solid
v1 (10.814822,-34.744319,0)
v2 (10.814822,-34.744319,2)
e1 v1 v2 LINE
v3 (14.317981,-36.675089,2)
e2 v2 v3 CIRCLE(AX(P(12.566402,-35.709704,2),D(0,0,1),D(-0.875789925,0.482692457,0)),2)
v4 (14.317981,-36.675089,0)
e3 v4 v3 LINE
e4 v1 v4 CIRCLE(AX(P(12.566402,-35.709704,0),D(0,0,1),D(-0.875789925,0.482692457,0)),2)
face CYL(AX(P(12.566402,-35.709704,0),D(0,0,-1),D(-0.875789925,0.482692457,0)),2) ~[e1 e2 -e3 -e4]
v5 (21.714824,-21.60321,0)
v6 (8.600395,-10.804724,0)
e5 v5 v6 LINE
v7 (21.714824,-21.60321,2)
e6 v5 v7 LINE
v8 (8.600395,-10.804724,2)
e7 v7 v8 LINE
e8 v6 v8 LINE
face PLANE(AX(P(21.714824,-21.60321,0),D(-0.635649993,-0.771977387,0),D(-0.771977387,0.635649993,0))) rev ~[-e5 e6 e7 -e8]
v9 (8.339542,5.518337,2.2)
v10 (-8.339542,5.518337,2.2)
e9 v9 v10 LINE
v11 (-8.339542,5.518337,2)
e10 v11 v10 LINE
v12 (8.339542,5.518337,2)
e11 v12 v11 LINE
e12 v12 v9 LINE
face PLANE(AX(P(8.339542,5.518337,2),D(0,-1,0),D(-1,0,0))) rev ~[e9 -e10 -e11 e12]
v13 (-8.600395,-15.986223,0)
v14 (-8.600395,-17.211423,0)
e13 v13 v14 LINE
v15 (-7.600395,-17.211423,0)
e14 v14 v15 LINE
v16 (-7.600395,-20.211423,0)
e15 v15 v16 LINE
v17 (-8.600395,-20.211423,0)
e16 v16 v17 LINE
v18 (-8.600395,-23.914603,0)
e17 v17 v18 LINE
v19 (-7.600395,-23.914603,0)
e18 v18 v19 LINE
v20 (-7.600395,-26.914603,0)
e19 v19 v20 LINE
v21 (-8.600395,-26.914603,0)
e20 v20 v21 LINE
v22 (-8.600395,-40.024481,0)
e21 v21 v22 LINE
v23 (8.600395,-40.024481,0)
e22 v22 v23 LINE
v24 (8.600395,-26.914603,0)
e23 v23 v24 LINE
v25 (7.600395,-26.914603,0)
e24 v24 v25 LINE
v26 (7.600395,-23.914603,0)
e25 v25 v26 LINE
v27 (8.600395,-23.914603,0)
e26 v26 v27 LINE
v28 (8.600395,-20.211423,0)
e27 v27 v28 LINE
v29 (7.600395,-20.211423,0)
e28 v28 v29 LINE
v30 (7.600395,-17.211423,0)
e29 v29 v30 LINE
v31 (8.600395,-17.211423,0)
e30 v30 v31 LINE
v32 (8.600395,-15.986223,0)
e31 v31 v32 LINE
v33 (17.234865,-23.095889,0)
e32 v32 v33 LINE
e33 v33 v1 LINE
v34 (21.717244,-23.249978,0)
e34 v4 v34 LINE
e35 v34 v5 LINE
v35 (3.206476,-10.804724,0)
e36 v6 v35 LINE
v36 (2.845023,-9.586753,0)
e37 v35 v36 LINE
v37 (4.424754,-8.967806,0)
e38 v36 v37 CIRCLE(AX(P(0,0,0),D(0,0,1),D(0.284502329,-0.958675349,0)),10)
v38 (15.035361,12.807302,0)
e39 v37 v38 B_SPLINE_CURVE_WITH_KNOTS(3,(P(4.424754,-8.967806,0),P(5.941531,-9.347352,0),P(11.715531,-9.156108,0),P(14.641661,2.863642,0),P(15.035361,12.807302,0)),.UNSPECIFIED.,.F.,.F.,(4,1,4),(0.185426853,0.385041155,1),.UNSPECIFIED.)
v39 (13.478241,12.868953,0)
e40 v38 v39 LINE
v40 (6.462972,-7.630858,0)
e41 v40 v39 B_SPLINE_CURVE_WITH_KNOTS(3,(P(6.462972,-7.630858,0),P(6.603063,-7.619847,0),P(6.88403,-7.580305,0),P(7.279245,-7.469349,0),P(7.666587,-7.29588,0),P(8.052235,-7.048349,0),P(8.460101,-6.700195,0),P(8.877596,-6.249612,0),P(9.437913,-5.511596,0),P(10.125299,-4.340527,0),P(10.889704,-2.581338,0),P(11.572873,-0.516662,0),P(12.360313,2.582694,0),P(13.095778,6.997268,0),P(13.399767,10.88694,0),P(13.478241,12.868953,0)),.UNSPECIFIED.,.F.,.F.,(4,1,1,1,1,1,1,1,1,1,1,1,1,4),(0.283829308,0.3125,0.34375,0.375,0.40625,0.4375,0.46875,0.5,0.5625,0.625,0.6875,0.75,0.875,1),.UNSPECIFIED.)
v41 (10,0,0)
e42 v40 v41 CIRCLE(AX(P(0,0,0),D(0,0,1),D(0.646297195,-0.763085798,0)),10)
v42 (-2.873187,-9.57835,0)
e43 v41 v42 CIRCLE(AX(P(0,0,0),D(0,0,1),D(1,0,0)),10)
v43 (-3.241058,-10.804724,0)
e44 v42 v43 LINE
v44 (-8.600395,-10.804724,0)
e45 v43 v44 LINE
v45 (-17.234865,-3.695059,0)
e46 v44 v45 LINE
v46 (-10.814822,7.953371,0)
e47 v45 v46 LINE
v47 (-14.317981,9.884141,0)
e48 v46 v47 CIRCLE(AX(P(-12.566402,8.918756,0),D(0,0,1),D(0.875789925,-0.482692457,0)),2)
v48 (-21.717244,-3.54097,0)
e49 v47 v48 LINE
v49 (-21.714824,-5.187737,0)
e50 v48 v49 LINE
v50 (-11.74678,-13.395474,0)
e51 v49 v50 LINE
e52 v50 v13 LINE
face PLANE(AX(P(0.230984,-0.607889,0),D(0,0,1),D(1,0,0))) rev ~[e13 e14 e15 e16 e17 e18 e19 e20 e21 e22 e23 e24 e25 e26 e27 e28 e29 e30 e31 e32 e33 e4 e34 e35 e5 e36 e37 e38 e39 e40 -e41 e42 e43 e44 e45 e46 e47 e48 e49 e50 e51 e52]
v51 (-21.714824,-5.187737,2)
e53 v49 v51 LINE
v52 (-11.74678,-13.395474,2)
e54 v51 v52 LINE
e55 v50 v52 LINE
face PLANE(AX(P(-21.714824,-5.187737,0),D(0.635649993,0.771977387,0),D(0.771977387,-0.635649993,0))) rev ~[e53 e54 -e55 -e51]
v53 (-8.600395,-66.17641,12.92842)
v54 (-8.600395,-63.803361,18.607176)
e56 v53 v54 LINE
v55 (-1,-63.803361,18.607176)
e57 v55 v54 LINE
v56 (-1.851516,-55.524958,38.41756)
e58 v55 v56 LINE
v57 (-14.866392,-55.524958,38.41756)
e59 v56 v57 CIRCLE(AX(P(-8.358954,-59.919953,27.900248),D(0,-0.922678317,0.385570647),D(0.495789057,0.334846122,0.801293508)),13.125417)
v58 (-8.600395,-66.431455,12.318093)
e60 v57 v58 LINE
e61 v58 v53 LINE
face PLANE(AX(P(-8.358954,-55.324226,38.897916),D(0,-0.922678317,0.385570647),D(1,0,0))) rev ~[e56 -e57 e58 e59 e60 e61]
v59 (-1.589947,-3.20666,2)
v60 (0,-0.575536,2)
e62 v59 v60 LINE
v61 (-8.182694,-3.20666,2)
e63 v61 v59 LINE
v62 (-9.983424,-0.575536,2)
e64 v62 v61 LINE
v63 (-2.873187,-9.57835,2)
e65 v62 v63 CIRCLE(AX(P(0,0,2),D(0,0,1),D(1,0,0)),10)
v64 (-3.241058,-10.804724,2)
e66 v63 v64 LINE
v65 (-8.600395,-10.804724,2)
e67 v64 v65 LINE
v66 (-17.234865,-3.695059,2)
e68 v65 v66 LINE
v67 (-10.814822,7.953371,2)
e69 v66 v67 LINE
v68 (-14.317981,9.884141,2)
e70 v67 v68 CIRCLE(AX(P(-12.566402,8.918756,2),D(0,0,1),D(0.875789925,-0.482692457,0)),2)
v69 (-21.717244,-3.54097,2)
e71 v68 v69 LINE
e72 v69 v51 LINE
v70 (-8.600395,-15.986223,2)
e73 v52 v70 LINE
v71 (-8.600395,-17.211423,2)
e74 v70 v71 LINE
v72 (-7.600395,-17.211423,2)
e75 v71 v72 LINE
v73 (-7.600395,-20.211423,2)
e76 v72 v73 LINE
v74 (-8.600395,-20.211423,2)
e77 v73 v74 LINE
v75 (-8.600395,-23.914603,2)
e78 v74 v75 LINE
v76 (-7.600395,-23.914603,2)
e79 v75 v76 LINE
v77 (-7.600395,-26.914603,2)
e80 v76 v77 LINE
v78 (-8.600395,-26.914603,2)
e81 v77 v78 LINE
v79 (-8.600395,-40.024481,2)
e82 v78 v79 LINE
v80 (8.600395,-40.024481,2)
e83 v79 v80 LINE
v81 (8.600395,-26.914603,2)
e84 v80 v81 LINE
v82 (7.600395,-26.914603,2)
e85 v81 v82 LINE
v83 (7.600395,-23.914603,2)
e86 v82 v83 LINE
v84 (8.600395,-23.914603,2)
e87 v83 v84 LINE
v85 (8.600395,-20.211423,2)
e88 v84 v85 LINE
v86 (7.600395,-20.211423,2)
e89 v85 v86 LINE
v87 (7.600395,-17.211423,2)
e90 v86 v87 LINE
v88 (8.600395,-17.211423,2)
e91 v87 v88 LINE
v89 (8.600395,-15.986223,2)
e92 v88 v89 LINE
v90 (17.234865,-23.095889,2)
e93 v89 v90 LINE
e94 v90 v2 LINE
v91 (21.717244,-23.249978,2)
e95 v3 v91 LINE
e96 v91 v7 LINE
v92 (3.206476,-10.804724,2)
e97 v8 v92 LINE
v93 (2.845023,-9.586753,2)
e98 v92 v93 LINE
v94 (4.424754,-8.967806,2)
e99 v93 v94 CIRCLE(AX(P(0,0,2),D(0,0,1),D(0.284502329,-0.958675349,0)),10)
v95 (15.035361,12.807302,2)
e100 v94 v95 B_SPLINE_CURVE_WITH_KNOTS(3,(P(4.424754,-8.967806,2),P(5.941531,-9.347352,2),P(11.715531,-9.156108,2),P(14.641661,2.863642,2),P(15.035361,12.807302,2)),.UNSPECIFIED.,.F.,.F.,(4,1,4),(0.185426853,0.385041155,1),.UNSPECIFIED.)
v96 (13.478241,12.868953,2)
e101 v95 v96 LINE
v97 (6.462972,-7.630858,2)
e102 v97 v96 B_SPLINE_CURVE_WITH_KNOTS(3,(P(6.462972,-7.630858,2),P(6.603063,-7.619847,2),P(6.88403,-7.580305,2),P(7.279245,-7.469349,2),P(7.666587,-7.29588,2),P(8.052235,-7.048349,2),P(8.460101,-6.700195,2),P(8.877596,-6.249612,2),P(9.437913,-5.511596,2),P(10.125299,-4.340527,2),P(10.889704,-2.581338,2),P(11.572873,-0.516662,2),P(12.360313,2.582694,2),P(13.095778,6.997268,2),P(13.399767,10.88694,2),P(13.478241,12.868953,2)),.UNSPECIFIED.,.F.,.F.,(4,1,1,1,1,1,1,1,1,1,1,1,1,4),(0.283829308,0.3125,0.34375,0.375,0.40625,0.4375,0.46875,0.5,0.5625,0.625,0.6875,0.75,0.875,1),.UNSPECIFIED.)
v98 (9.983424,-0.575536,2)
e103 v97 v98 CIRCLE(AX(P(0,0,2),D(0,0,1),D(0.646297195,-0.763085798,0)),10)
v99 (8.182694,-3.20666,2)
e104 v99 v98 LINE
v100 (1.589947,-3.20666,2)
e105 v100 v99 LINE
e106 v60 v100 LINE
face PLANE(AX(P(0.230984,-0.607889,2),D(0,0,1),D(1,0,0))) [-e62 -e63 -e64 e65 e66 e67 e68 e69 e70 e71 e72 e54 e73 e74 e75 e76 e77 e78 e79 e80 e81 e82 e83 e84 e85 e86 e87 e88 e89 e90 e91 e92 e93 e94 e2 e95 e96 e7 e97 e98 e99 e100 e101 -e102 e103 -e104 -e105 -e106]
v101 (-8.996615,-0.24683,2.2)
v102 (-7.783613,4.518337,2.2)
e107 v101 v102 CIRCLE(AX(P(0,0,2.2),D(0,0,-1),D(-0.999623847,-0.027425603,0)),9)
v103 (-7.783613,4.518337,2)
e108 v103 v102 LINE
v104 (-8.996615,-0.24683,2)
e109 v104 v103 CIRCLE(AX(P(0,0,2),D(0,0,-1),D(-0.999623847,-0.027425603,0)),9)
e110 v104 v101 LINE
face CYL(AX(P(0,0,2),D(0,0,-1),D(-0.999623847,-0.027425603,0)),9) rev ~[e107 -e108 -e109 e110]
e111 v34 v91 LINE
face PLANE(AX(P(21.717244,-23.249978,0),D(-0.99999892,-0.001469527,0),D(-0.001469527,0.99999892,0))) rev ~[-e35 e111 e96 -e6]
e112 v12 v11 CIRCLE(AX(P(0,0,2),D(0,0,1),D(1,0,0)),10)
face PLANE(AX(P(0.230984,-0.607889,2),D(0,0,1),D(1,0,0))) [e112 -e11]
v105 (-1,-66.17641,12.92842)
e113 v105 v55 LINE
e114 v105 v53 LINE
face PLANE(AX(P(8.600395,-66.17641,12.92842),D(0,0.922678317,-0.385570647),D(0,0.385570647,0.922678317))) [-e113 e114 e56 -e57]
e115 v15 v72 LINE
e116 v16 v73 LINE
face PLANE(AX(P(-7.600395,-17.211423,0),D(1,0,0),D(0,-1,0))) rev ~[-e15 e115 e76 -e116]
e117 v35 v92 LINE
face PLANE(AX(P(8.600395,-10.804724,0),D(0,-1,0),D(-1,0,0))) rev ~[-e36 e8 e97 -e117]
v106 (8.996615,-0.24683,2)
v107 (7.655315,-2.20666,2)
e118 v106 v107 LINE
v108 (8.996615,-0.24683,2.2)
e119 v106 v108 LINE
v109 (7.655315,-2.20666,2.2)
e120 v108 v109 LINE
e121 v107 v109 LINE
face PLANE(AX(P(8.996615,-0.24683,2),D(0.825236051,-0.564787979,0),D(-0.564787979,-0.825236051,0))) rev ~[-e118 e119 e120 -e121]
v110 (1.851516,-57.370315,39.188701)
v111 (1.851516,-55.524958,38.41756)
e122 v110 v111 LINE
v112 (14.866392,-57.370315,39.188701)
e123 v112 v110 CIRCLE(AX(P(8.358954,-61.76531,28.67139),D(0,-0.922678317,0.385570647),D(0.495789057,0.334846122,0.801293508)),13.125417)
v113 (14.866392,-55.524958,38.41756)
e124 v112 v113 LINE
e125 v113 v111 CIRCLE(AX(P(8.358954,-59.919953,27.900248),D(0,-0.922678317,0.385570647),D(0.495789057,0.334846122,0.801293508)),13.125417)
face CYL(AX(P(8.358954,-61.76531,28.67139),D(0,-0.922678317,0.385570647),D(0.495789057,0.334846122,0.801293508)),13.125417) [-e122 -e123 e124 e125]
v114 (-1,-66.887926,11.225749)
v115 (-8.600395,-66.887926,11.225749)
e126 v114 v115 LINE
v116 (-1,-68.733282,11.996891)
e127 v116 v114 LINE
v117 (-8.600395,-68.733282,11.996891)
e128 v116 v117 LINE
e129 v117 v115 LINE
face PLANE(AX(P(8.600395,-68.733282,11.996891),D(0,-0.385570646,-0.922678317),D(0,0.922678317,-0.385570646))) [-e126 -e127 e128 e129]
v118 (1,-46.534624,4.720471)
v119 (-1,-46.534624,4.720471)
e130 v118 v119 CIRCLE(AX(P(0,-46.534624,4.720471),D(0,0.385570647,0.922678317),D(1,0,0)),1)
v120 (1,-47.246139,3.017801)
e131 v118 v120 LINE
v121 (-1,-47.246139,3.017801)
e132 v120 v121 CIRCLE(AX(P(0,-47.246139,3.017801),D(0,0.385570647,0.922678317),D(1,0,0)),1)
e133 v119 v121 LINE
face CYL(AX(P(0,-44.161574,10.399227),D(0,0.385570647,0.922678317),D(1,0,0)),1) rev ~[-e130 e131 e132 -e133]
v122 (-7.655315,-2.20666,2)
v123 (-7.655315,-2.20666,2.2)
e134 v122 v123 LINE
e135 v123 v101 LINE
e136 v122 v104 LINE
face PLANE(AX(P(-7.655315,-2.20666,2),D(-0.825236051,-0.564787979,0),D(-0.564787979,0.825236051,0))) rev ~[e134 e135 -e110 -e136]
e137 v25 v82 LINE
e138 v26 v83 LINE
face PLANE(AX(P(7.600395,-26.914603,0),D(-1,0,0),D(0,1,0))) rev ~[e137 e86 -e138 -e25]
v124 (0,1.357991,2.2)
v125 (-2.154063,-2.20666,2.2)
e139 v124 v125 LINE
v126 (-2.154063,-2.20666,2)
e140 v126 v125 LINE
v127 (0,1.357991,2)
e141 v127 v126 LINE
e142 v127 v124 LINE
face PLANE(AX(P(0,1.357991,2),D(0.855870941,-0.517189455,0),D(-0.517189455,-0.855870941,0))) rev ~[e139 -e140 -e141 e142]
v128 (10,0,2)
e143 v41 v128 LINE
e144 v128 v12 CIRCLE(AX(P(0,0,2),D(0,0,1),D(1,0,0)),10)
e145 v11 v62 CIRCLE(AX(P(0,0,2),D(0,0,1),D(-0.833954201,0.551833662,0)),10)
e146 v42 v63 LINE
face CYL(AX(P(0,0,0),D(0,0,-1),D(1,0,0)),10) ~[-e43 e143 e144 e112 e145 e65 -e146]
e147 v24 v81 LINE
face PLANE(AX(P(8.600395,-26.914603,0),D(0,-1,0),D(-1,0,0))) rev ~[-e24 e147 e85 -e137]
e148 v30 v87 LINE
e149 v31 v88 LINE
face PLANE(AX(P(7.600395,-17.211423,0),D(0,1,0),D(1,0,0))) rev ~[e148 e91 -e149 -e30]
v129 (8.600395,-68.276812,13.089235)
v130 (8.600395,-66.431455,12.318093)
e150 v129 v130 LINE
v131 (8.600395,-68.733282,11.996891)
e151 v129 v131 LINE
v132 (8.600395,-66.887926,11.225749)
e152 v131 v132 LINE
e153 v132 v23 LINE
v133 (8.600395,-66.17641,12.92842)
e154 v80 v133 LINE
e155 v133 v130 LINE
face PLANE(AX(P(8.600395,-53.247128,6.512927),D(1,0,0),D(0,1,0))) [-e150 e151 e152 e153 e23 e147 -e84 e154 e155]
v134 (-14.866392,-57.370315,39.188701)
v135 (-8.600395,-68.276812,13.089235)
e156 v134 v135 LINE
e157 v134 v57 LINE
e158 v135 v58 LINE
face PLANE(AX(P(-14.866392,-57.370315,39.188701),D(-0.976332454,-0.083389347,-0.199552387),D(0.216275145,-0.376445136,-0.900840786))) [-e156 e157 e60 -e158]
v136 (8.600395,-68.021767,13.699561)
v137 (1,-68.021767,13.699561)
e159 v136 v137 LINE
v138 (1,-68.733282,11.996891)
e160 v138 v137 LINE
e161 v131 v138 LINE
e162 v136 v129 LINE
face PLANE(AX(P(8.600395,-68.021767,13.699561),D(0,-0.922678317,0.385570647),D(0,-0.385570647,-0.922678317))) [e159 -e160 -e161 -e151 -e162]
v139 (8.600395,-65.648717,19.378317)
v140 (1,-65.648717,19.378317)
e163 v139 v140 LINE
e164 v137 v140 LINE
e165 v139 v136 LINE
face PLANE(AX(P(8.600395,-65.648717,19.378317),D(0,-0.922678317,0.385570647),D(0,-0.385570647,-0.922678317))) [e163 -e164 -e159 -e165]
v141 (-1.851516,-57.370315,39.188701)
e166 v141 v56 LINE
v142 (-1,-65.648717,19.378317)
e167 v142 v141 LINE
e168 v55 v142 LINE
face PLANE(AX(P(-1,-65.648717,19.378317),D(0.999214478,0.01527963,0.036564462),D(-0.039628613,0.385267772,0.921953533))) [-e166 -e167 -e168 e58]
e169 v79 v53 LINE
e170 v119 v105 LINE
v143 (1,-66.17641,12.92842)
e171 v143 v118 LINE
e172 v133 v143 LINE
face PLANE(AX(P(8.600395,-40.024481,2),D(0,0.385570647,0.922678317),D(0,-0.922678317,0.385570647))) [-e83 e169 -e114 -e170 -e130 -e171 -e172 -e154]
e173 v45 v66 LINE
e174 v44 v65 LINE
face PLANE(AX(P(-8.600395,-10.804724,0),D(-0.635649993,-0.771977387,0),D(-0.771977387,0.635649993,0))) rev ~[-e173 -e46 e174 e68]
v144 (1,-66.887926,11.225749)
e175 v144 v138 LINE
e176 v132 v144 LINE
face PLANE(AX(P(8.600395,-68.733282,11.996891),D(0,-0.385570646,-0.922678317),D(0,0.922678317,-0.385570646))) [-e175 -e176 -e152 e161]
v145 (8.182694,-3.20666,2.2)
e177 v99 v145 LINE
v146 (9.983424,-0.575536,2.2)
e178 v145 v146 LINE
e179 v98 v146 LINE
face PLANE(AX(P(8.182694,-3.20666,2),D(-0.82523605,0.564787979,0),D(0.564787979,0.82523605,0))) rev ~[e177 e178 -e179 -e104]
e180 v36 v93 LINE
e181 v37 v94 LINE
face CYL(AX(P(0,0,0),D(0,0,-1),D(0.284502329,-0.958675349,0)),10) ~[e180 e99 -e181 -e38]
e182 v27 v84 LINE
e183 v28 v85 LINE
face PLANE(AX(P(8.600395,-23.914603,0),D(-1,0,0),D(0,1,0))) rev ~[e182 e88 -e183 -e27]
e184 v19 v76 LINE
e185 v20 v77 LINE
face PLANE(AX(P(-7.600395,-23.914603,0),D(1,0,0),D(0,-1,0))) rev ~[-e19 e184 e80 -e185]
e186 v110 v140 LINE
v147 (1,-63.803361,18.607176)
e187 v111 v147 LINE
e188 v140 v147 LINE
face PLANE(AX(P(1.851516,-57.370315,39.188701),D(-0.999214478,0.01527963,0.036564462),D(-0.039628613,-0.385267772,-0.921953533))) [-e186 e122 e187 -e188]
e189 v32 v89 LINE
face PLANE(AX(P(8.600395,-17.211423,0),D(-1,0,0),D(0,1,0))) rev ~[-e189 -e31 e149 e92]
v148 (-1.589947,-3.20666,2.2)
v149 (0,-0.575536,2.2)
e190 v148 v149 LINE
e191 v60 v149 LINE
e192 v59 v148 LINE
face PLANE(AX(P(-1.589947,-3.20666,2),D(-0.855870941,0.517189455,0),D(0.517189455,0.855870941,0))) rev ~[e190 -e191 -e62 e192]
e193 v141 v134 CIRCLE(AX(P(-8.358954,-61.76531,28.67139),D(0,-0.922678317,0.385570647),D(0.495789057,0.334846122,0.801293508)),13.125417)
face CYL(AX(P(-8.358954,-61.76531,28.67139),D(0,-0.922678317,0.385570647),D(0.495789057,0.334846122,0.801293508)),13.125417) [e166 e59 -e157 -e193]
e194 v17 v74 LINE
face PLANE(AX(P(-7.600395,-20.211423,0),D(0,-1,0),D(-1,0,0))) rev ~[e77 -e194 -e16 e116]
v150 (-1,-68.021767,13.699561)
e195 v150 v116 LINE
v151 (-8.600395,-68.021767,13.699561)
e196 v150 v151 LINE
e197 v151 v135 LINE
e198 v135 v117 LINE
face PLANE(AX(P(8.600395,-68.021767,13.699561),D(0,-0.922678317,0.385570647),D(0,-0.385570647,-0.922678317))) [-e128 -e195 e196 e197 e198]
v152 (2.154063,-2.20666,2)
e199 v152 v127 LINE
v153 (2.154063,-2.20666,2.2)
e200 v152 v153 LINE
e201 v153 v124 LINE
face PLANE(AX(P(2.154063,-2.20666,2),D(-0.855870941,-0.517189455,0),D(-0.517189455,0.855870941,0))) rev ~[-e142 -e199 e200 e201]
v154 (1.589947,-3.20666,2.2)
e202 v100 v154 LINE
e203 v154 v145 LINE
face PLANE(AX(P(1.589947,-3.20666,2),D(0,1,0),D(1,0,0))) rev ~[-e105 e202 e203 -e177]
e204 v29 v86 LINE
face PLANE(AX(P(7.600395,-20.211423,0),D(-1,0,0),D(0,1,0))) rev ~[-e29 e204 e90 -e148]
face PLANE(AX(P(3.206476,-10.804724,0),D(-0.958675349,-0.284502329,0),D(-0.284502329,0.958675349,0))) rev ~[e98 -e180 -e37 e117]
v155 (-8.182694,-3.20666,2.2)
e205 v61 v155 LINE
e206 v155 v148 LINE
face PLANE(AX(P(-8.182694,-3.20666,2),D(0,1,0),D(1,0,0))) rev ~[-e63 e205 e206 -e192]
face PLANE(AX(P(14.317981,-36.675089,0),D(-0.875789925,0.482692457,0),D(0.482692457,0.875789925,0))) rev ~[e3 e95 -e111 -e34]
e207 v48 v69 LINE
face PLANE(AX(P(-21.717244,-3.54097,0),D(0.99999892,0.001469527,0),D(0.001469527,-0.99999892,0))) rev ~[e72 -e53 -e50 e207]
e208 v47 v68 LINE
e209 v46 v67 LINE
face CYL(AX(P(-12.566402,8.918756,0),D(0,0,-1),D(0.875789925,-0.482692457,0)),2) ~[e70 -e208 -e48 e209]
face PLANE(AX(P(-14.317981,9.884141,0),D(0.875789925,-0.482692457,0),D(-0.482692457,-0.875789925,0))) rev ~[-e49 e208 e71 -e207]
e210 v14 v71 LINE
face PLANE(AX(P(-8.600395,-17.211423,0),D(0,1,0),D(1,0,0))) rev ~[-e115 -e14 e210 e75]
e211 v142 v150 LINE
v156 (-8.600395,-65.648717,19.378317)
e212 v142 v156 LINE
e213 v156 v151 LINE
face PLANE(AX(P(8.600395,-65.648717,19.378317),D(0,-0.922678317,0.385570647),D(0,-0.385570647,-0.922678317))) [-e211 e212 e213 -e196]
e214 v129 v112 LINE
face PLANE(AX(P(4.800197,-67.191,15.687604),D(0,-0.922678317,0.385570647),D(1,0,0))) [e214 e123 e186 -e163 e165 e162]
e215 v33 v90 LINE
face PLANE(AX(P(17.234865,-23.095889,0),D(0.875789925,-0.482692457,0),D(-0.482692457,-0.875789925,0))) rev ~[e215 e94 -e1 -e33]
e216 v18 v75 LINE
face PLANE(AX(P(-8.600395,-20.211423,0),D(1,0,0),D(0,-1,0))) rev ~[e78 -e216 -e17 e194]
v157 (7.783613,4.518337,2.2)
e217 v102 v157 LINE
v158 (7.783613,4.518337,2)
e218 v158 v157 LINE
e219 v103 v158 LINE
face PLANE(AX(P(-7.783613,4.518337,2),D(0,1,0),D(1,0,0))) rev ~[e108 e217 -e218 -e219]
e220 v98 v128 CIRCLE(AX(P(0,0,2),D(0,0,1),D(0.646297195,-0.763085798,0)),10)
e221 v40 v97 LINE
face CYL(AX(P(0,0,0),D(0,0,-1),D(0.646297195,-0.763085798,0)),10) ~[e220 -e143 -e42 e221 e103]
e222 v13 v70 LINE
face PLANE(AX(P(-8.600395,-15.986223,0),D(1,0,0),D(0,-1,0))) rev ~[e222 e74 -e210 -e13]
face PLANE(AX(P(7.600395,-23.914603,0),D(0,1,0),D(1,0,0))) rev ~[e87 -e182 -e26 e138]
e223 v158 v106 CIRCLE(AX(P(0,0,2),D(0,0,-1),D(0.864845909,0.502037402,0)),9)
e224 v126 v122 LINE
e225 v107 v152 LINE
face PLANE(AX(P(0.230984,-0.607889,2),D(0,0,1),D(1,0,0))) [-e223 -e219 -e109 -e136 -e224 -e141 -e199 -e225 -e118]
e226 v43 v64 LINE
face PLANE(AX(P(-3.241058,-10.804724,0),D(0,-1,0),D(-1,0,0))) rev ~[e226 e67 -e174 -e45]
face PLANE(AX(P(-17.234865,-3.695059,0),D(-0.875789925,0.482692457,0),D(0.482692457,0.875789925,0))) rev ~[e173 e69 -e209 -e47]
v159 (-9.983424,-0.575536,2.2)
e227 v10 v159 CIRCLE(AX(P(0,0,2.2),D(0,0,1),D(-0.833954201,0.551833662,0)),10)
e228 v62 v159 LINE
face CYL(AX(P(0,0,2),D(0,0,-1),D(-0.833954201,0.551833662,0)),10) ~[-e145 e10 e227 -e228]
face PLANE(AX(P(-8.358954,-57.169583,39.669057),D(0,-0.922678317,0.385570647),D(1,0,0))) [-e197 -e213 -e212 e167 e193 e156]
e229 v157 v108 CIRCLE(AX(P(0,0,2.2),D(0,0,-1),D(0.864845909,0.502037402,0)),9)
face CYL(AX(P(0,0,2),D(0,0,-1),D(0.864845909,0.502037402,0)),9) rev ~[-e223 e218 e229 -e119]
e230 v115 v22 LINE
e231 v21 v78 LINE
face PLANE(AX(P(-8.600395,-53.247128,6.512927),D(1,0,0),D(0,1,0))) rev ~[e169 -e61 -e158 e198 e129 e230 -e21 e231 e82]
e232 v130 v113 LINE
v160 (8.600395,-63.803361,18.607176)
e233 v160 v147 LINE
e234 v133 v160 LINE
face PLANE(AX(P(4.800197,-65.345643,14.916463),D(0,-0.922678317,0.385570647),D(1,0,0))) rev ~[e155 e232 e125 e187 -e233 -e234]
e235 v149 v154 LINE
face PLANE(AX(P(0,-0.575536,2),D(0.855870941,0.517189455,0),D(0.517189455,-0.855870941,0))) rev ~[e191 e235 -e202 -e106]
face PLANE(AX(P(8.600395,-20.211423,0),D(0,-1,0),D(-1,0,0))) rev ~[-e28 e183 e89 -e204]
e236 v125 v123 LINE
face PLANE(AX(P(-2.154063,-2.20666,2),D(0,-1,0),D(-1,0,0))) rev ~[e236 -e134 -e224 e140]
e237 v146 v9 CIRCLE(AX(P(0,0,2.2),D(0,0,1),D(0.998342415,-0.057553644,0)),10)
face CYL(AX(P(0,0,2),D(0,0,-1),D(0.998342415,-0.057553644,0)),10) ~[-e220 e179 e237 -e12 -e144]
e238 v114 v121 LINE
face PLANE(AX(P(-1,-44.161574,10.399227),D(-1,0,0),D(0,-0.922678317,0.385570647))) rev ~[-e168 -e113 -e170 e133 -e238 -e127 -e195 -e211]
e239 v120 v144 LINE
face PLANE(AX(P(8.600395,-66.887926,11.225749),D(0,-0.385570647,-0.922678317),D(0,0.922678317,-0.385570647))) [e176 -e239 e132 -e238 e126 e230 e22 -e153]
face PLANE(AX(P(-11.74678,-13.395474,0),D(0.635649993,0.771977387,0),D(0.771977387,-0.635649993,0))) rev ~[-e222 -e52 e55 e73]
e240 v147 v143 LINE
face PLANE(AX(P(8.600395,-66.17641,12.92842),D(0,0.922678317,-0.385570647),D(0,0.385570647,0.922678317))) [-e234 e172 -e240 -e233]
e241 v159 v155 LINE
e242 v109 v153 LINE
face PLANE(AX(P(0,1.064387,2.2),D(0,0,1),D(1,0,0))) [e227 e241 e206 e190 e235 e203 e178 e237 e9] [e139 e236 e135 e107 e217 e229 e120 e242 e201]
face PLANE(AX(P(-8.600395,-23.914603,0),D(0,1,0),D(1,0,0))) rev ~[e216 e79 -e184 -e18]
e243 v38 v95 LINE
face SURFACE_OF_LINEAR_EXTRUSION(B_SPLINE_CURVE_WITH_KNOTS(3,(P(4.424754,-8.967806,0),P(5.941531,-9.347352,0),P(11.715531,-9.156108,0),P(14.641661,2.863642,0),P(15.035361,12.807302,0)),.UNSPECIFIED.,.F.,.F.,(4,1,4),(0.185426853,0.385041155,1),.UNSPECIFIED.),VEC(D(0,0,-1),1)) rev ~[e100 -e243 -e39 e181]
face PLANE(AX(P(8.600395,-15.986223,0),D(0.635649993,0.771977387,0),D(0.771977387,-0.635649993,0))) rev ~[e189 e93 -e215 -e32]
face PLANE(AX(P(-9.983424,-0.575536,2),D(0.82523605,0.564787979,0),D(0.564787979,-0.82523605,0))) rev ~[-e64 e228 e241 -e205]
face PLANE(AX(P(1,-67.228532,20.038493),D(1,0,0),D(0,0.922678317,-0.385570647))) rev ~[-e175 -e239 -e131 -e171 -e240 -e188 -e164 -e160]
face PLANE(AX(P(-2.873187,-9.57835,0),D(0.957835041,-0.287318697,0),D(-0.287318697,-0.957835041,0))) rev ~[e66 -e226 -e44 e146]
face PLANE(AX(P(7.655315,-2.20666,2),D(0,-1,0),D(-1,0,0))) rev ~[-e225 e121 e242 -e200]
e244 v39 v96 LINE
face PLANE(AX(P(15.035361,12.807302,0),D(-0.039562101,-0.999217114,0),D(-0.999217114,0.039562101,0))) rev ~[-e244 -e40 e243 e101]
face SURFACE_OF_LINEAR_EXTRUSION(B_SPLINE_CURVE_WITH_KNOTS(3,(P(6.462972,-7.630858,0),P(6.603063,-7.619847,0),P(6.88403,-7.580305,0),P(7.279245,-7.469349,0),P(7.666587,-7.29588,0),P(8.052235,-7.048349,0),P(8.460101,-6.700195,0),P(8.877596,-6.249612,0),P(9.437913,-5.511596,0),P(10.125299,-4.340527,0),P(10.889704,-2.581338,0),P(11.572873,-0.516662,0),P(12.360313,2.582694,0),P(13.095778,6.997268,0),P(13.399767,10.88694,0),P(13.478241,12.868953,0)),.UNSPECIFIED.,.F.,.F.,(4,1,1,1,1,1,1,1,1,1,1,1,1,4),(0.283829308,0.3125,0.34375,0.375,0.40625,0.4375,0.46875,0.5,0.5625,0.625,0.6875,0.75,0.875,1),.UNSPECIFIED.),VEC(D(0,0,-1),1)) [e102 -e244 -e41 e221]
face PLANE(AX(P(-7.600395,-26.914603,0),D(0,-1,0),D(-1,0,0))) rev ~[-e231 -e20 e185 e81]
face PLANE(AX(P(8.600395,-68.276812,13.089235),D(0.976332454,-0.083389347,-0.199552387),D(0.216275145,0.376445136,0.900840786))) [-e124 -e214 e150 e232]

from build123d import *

# Parameters (mm, degrees)
F1_DEPTH = 2
F3_DEPTH = 17.200789751
F4_W     = 1
F4_H     = 2
F5_DEPTH = 25
F7_DEPTH = 2
F9_DEPTH = 0.2


# Not quite as in the source:
# - the dataset's text gives a spline's control points without its knots; the knots are read off the source's solid
# - a feature names something its author has since deleted; it is built from what else it names


with BuildPart() as f1:
    # F0 (on Top) → F1 (new body)
    with BuildSketch(Plane.XY):
        with BuildLine():
            ThreePointArc((6.4629719502, -7.6308579839), (9.0727537028, -4.2053704057), (10, 0))
            ThreePointArc((10, 0), (-5.9694275413, 8.0228383275), (-2.8731869657, -9.5783504143))
            Line((-2.8731869657, -9.5783504143), (0, 0))
            Line((0, 0), (1.8618540828, -6.2738101865))
            add(Edge.make_bspline(
                [(1.8618540828, -6.2738101865), (1.9794198127, -6.3341629295), (2.5732776532, -6.6333178765), (3.6057370778, -7.0964112527), (4.8687885055, -7.50576435), (5.8045739388, -7.6494945297), (6.2976751035, -7.6438504545), (6.4629719502, -7.6308579839)],
                knots=[0.0471973375, 0.0471973375, 0.0471973375, 0.0471973375, 0.0625, 0.125, 0.1875, 0.25, 0.2838293075, 0.2838293075, 0.2838293075, 0.2838293075], degree=3))
        make_face()
        with BuildLine():
            Line((0, 0), (-2.8731869657, -9.5783504143))
            ThreePointArc((-2.8731869657, -9.5783504143), (-0.0146952719, -9.9999892024), (2.8450232941, -9.5867534888))
            Line((2.8450232941, -9.5867534888), (2.4577875555, -8.2819017585))
            Line((2.4577875555, -8.2819017585), (1.8618540828, -6.2738101865))
            Line((1.8618540828, -6.2738101865), (0, 0))
        make_face()
        with BuildLine():
            ThreePointArc((2.8450232941, -9.5867534888), (-0.0146952719, -9.9999892024), (-2.8731869657, -9.5783504143))
            Line((-2.8731869657, -9.5783504143), (-3.241058439, -10.8047244445))
            Line((-3.241058439, -10.8047244445), (3.2064757654, -10.8047244445))
            Line((3.2064757654, -10.8047244445), (2.8450232941, -9.5867534888))
        make_face()
        with BuildLine():
            add(Edge.make_bspline(
                [(6.4629719502, -7.6308579839), (6.6030627596, -7.619846729), (6.8840296576, -7.5803052276), (7.2792450589, -7.4693493545), (7.6665868261, -7.2958798164), (8.0522350381, -7.0483493763), (8.4601010219, -6.700195356), (8.8775961576, -6.2496121629), (9.4379128784, -5.5115962551), (10.1252991034, -4.3405271139), (10.8897039738, -2.5813381399), (11.5728725961, -0.5166619682), (12.3603130252, 2.5826938425), (13.095778184, 6.9972675513), (13.399766994, 10.8869404738), (13.4782410246, 12.8689533823)],
                knots=[0.2838293075, 0.2838293075, 0.2838293075, 0.2838293075, 0.3125, 0.34375, 0.375, 0.40625, 0.4375, 0.46875, 0.5, 0.5625, 0.625, 0.6875, 0.75, 0.875, 1, 1, 1, 1], degree=3))
            ThreePointArc((6.4629719502, -7.6308579839), (5.4847517485, -8.3616683896), (4.4247539743, -8.9678064356))
            add(Edge.make_bspline(
                [(4.4247539743, -8.9678064356), (5.941531364, -9.347351876), (11.7155314673, -9.1561084525), (14.6416607546, 2.8636422945), (15.0353610516, 12.807302177)],
                knots=[0.1854268528, 0.1854268528, 0.1854268528, 0.1854268528, 0.3850411547, 1, 1, 1, 1], degree=3))
            Line((15.0353610516, 12.807302177), (13.4782410246, 12.8689533823))
        make_face()
        with BuildLine():
            ThreePointArc((4.4247539743, -8.9678064356), (5.4847517485, -8.3616683896), (6.4629719502, -7.6308579839))
            add(Edge.make_bspline(
                [(1.8618540828, -6.2738101865), (1.9794198127, -6.3341629295), (2.5732776532, -6.6333178765), (3.6057370778, -7.0964112527), (4.8687885055, -7.50576435), (5.8045739388, -7.6494945297), (6.2976751035, -7.6438504545), (6.4629719502, -7.6308579839)],
                knots=[0.0471973375, 0.0471973375, 0.0471973375, 0.0471973375, 0.0625, 0.125, 0.1875, 0.25, 0.2838293075, 0.2838293075, 0.2838293075, 0.2838293075], degree=3))
            Line((1.8618540828, -6.2738101865), (2.4577875555, -8.2819017585))
            add(Edge.make_bspline(
                [(2.4577875555, -8.2819017585), (3.1280804798, -8.5721149462), (3.7854626045, -8.8078356145), (4.4247539743, -8.9678064356)],
                knots=[0.1012934121, 0.1012934121, 0.1012934121, 0.1012934121, 0.1854268528, 0.1854268528, 0.1854268528, 0.1854268528], degree=3))
        make_face()
        with BuildLine():
            Line((2.4577875555, -8.2819017585), (2.8450232941, -9.5867534888))
            ThreePointArc((2.8450232941, -9.5867534888), (3.6480390961, -9.3108437186), (4.4247539743, -8.9678064356))
            add(Edge.make_bspline(
                [(2.4577875555, -8.2819017585), (3.1280804798, -8.5721149462), (3.7854626045, -8.8078356145), (4.4247539743, -8.9678064356)],
                knots=[0.1012934121, 0.1012934121, 0.1012934121, 0.1012934121, 0.1854268528, 0.1854268528, 0.1854268528, 0.1854268528], degree=3))
        make_face()
        Polygon((3.2064757654, -10.8047244445), (-3.241058439, -10.8047244445), (-8.6003948755, -10.8047244445), (-8.6003948755, -15.9862233672), (-8.6003948755, -17.2114234168), (-7.6003948755, -17.2114234168), (-7.6003948755, -20.2114234168), (-8.6003948755, -20.2114234168), (-8.6003948755, -23.9146029156), (-7.6003948755, -23.9146029156), (-7.6003948755, -26.9146029156), (-8.6003948755, -26.9146029156), (-8.6003948755, -40.0244813867), (8.6003948755, -40.0244813867), (8.6003948755, -26.9146029156), (7.6003948755, -26.9146029156), (7.6003948755, -23.9146029156), (8.6003948755, -23.9146029156), (8.6003948755, -20.2114234168), (7.6003948755, -20.2114234168), (7.6003948755, -17.2114234168), (8.6003948755, -17.2114234168), (8.6003948755, -15.9862233672), (8.6003948755, -10.8047244445), align=None)
        Polygon((-8.6003948755, -15.9862233672), (-8.6003948755, -10.8047244445), (-11.7467804993, -13.3954739058), align=None)
        with BuildLine():
            Line((-11.7467804993, -13.3954739058), (-8.6003948755, -10.8047244445))
            Line((-8.6003948755, -10.8047244445), (-17.2348651583, -3.6950589713))
            Line((-17.2348651583, -3.6950589713), (-10.8148216824, 7.9533712388))
            ThreePointArc((-10.8148216824, 7.9533712388), (-11.6010166189, 10.6703360015), (-14.3179813816, 9.884141065))
            Line((-14.3179813816, 9.884141065), (-21.7172442848, -3.5409701289))
            Line((-21.7172442848, -3.5409701289), (-21.7148243129, -5.1877374014))
            Line((-21.7148243129, -5.1877374014), (-11.7467804993, -13.3954739058))
        make_face()
        with BuildLine():
            Line((21.7148243129, -21.6032104103), (8.6003948755, -10.8047244445))
            Line((8.6003948755, -10.8047244445), (8.6003948755, -15.9862233672))
            Line((8.6003948755, -15.9862233672), (17.2348651583, -23.0958888404))
            Line((17.2348651583, -23.0958888404), (10.8148216824, -34.7443190505))
            ThreePointArc((10.8148216824, -34.7443190505), (11.6010166189, -37.4612838132), (14.3179813816, -36.6750888767))
            Line((14.3179813816, -36.6750888767), (21.7172442848, -23.2499776828))
            Line((21.7172442848, -23.2499776828), (21.7148243129, -21.6032104103))
        make_face()
    extrude(amount=F1_DEPTH)

    # F2 (on face) → F3 (join, through all)
    with BuildSketch(Plane.YZ.offset(8.6003948755)):
        Polygon((-40.0244813867, 0), (-40.0244813867, 2), (-66.176410403, 12.9284200062), (-66.8879257534, 11.2257494531), align=None)
        Polygon((-66.8879257534, 11.2257494531), (-66.176410403, 12.9284200062), (-68.0217670369, 13.6995612992), (-68.7332823873, 11.9968907461), align=None)
        Polygon((-68.0217670369, 13.6995612992), (-66.176410403, 12.9284200062), (-63.8033605813, 18.6071759886), (-65.6487172152, 19.3783172816), align=None)
    extrude(amount=-F3_DEPTH)

    # F4 (on face) → F5 (cut)
    with BuildSketch(Plane(origin=(0, -2.8656632843, -6.8575899128), x_dir=(1, 0, 0), z_dir=(0, 0.3855706465, 0.9226783169))):
        with Locations((-0.5, -67.044358232)):
            Rectangle(F4_W, F4_H)
        with BuildLine():
            Line((1, -68.044358232), (0, -68.044358232))
            Line((0, -68.044358232), (-1, -68.044358232))
            Line((-1, -68.044358232), (-1, -69.7565637529))
            ThreePointArc((-1, -69.7565637529), (0, -70.7565637529), (1, -69.7565637529))
            Line((1, -69.7565637529), (1, -68.044358232))
        make_face()
        with Locations((0.5, -67.044358232)):
            Rectangle(F4_W, F4_H)
        with BuildLine():
            Line((-1, -66.044358232), (0, -66.044358232))
            Line((0, -66.044358232), (1, -66.044358232))
            Line((1, -66.044358232), (1, -44.7565637529))
            ThreePointArc((1, -44.7565637529), (0, -43.7565637529), (-1, -44.7565637529))
            Line((-1, -44.7565637529), (-1, -66.044358232))
        make_face()
    extrude(amount=-F5_DEPTH, mode=Mode.SUBTRACT)

    # F6 (on face) → F7 (join)
    with BuildSketch(Plane(origin=(0, -62.7830539309, 26.2359071944), x_dir=(1, 0, 0), z_dir=(0, -0.9226783169, 0.3855706465))):
        with BuildLine():
            ThreePointArc((-1.8515158445, 14.0382554382), (-8.3589539863, 15.7649961788), (-14.8663921282, 14.0382554382))
            Line((-14.8663921282, 14.0382554382), (-1.8515158445, 14.0382554382))
        make_face()
        Polygon((1, -15.4322651642), (8.6003948755, -15.4322651642), (8.6003948755, -14.2483813688), (8.6003948755, -7.4322651642), (1, -7.4322651642), align=None)
        with BuildLine():
            Line((8.6003948755, -7.4322651642), (8.6003948755, -14.2483813688))
            Line((8.6003948755, -14.2483813688), (14.8663921282, 14.0382554382))
            ThreePointArc((14.8663921282, 14.0382554382), (8.3589539863, 15.7649961788), (1.8515158445, 14.0382554382))
            Line((1.8515158445, 14.0382554382), (1, -7.4322651642))
            Line((1, -7.4322651642), (8.6003948755, -7.4322651642))
        make_face()
        Polygon((-8.6003948755, -7.4322651642), (-1, -7.4322651642), (-1.8515158445, 14.0382554382), (-14.8663921282, 14.0382554382), (-8.6003948755, -14.2483813688), align=None)
    extrude(amount=-F7_DEPTH)

    # F8 (on face) → F9 (join)
    with BuildSketch(Plane.XY.offset(2)):
        with BuildLine():
            Line((8.3395420131, 5.5183366165), (-8.3395420131, 5.5183366165))
            ThreePointArc((-8.3395420131, 5.5183366165), (-9.6548741312, 2.6044971704), (-9.9834241522, -0.575536443))
            Line((-9.9834241522, -0.575536443), (-8.1826943192, -3.206660389))
            Line((-8.1826943192, -3.206660389), (-1.5899471466, -3.206660389))
            Line((-1.5899471466, -3.206660389), (0, -0.575536443))
            Line((0, -0.575536443), (1.5899471466, -3.206660389))
            Line((1.5899471466, -3.206660389), (8.1826943192, -3.206660389))
            Line((8.1826943192, -3.206660389), (9.9834241522, -0.575536443))
            ThreePointArc((9.9834241522, -0.575536443), (9.6548741312, 2.6044971704), (8.3395420131, 5.5183366165))
        make_face()
        with BuildLine():
            ThreePointArc((-8.9966146265, -0.2468304304), (-8.721852762, 2.2201991799), (-7.7836131854, 4.5183366165))
            Line((-7.7836131854, 4.5183366165), (7.7836131854, 4.5183366165))
            ThreePointArc((7.7836131854, 4.5183366165), (8.721852762, 2.2201991799), (8.9966146265, -0.2468304304))
            Line((8.9966146265, -0.2468304304), (7.6553154911, -2.206660389))
            Line((7.6553154911, -2.206660389), (2.1540632086, -2.206660389))
            Line((2.1540632086, -2.206660389), (0, 1.3579909904))
            Line((0, 1.3579909904), (-2.1540632086, -2.206660389))
            Line((-2.1540632086, -2.206660389), (-7.6553154911, -2.206660389))
            Line((-7.6553154911, -2.206660389), (-8.9966146265, -0.2468304304))
        make_face(mode=Mode.SUBTRACT)
    extrude(amount=F9_DEPTH)


solid = f1.part
